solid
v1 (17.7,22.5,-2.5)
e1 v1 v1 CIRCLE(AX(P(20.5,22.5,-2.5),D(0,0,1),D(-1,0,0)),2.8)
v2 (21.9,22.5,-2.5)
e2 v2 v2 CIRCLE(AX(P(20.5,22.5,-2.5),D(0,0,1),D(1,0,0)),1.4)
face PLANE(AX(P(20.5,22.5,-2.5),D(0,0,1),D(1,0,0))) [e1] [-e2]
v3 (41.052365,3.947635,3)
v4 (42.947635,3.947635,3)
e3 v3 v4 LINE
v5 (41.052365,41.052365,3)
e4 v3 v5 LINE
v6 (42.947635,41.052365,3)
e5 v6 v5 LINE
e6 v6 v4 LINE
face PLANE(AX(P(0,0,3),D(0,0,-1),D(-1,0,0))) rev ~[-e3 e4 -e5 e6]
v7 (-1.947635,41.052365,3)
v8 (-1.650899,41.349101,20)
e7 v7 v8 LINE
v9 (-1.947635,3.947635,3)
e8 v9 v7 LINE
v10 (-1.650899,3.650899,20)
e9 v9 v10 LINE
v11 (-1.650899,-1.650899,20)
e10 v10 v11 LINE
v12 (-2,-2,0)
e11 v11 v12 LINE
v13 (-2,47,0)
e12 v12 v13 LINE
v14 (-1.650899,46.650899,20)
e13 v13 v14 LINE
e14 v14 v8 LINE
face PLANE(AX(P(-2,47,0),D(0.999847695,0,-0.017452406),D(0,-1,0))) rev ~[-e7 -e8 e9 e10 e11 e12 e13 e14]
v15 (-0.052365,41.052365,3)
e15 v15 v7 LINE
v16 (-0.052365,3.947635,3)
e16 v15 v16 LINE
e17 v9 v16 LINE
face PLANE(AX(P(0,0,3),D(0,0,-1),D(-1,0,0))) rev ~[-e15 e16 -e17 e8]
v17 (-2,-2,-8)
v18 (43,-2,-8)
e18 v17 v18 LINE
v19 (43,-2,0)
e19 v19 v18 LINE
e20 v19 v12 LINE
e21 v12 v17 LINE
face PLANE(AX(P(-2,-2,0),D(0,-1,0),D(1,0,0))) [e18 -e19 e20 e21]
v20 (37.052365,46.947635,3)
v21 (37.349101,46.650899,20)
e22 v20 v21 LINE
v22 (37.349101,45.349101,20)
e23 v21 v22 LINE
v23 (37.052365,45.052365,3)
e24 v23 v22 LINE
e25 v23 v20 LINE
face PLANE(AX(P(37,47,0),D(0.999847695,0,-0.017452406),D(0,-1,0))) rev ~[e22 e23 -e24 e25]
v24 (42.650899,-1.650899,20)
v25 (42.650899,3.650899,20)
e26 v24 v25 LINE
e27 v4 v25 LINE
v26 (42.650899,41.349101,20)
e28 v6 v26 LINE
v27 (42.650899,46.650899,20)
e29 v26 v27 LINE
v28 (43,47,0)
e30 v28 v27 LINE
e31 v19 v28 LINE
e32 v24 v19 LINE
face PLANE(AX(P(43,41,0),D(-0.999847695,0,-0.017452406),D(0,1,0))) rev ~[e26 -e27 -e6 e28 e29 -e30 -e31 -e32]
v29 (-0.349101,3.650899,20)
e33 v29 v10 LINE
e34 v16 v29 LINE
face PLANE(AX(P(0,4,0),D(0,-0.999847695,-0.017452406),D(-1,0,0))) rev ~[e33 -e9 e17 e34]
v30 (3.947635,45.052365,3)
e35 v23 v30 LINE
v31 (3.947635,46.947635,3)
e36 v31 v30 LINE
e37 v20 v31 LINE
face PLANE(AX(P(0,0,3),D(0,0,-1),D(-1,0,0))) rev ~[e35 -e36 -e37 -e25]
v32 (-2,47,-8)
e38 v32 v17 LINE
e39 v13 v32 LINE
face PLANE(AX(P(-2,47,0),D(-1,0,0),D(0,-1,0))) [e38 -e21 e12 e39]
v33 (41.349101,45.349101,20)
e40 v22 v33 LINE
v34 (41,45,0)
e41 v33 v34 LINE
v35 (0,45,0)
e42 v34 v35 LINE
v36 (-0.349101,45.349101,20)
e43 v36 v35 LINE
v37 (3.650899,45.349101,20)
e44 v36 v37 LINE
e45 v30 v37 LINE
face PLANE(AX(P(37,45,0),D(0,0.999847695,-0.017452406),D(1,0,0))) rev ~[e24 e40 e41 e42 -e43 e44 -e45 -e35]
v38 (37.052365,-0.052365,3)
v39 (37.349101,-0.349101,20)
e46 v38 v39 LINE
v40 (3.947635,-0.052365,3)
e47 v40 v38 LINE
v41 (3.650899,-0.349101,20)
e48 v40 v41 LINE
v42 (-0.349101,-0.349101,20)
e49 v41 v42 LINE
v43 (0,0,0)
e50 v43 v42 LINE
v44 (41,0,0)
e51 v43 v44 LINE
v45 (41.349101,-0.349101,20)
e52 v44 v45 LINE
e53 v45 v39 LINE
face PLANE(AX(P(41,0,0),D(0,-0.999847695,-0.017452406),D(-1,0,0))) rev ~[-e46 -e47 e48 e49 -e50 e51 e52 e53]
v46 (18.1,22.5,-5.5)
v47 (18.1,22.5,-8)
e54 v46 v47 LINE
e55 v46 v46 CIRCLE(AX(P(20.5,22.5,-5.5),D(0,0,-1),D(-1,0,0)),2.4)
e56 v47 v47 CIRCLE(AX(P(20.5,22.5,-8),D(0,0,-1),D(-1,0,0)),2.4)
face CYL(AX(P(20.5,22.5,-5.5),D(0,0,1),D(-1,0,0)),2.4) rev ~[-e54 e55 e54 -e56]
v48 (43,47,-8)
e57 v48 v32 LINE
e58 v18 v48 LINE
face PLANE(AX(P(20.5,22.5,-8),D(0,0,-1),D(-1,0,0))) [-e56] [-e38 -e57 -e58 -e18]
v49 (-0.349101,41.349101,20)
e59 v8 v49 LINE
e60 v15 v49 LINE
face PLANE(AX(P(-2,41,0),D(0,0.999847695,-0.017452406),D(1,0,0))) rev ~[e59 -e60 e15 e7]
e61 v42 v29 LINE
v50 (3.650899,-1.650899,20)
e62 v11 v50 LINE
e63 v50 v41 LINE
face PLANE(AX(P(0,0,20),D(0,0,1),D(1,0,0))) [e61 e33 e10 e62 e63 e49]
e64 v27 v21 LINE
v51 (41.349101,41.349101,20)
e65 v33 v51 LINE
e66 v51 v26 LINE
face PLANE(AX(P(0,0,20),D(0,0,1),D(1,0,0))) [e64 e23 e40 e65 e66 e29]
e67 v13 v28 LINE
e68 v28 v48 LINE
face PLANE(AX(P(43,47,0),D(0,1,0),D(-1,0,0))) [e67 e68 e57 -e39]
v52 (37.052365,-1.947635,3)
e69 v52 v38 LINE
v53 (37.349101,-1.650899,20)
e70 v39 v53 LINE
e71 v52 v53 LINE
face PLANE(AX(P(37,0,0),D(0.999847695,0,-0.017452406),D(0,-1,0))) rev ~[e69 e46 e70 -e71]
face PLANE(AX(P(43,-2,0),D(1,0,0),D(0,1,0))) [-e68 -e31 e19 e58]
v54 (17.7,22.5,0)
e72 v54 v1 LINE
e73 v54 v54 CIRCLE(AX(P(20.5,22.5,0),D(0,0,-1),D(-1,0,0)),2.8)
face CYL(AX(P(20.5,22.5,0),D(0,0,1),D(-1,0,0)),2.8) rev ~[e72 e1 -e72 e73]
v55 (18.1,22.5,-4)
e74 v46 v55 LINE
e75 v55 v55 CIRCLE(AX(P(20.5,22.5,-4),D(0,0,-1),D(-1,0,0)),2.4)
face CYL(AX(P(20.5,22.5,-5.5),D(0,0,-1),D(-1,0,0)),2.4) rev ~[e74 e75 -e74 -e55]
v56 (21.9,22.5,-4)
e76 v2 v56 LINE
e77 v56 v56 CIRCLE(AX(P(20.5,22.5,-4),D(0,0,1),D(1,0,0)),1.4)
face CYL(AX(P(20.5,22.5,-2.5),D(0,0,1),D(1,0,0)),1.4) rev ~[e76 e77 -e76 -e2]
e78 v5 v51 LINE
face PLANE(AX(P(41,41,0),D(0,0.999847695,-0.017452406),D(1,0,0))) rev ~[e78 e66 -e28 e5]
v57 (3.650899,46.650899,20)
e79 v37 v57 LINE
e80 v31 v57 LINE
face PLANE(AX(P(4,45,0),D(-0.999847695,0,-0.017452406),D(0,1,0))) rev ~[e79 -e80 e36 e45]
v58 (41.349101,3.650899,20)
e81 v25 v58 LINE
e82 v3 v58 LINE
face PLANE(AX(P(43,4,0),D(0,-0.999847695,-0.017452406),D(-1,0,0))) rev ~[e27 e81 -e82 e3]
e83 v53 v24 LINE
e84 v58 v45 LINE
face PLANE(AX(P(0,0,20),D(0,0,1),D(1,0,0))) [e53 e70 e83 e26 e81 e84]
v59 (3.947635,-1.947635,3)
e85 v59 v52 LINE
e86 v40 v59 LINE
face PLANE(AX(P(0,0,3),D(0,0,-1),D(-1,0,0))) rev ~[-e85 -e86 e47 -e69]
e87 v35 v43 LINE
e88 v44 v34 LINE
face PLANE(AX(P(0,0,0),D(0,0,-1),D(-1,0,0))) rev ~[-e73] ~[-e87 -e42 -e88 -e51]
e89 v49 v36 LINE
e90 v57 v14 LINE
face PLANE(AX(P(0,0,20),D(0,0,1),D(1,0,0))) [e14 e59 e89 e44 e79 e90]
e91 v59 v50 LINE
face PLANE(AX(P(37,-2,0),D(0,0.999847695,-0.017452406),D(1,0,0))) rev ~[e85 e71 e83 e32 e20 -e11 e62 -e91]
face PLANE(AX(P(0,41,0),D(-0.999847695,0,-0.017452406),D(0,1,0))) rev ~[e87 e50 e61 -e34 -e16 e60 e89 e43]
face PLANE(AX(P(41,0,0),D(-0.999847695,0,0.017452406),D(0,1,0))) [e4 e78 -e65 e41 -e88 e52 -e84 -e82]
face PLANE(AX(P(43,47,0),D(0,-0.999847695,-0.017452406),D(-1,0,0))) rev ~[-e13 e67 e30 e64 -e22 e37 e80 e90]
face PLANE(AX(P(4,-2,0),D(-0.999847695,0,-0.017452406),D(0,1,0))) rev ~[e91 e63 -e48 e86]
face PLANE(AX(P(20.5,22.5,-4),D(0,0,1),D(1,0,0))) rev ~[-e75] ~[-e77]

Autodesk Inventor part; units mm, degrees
ref_plane "YZ Plane" through (0, 0, 0) normal (1, 0, 0) x (0, 1, 0)
ref_plane "XZ Plane" through (0, 0, 0) normal (0, 1, 0) x (-1, 0, 0)
sketch "Szkic1" plane through (0, 0, 0) normal (0, 0, 1) x (1, 0, 0)
  line L0 (0, 0) -> (41, 0)
  line L1 (41, 0) -> (41, 45)
  line L2 (41, 45) -> (0, 45)
  line L3 (0, 45) -> (0, 0)
  line L4 (0, 45) -> (-2, 45)
  line L5 (-2, 45) -> (-2, 47)
  line L6 (41, 0) -> (41, -2)
  line L7 (41, -2) -> (43, -2)
  line L8 (43, -2) -> (-2, -2)
  line L9 (-2, -2) -> (-2, 47)
  line L10 (-2, 47) -> (43, 47)
  line L11 (43, 47) -> (43, -2)
  line L12 (41, 45) -> (37, 45)
  line L13 (37, 45) -> (37, 47)
  line L14 (43, 47) -> (37, 47)
  line L15 (41, 45) -> (41, 41)
  line L16 (41, 41) -> (43, 41)
  line L17 (43, 47) -> (43, 41)
  line L18 (43, 47) -> (37, 47)
  line L19 (20.5, 47) -> (20.5, -2)
  line L20 (-2, 22.5) -> (43, 22.5)
  line L21 (0, 45) -> (41, 45)
  line L22 (43, 47) -> (-2, 47)
  line L23 (-2, 47) -> (-2, -2)
  line L24 (4, 45) -> (4, 47)
  line L25 (0, 41) -> (-2, 41)
  line L26 (41, 0) -> (0, 0)
  line L27 (0, 0) -> (0, 45)
  line L28 (0, 0) -> (-2, 0)
  line L29 (-2, -2) -> (43, -2)
  line L30 (43, -2) -> (43, 47)
  line L31 (41, 4) -> (43, 4)
  line L32 (-2, -2) -> (-2, 47)
  line L33 (4, 0) -> (4, -2)
  line L34 (0, 0) -> (0, 4)
  line L35 (0, 4) -> (-2, 4)
  line L36 (41, 0) -> (37, 0)
  line L37 (37, 0) -> (37, -2)
  line L38 (37, -2) -> (43, -2)
  dimension "d0" = 41
  dimension "d1" = 45
  dimension "d2" = 2
  dimension "d3" = 2
  dimension "d4" = 2
  dimension "d5" = 2
  dimension "d6" = 4
  dimension "d7" = 4
  dimension "d8" = 4
  dimension "d9" = 4
sketch "Szkic1 outline for Wyciągnięcie proste1" plane through (0, 0, 0) normal (0, 0, 1) x (1, 0, 0)
  line L0 (41, 41) -> (43, 41)
  line L1 (41, 45) -> (41, 41)
  line L2 (37, 45) -> (41, 45)
  line L3 (37, 47) -> (37, 45)
  line L4 (43, 47) -> (37, 47)
  line L5 (43, 41) -> (43, 47)
  line L6 (43, 4) -> (41, 4)
  line L7 (41, 4) -> (41, 0)
  line L8 (41, 0) -> (37, 0)
  line L9 (37, 0) -> (37, -2)
  line L10 (37, -2) -> (43, -2)
  line L11 (43, -2) -> (43, 4)
  line L12 (0, 4) -> (-2, 4)
  line L13 (0, 0) -> (0, 4)
  line L14 (4, 0) -> (0, 0)
  line L15 (4, -2) -> (4, 0)
  line L16 (-2, -2) -> (4, -2)
  line L17 (-2, 4) -> (-2, -2)
  line L18 (4, 45) -> (4, 47)
  line L19 (4, 47) -> (-2, 47)
  line L20 (-2, 47) -> (-2, 41)
  line L21 (-2, 41) -> (0, 41)
  line L22 (0, 41) -> (0, 45)
  line L23 (0, 45) -> (4, 45)
extrude "Wyciągnięcie proste1" add sketch "Szkic1 outline for Wyciągnięcie proste1" along normal blind 20 draft -1
sketch "Szkic2" plane through (0, 0, 0) normal (0, 0, -1) x (-1, 0, 0)
  line L0 (-43, 41) -> (-43, 47) projected
  line L1 (2, 4) -> (2, -2) projected
  line L2 (-43, 47) -> (2, 47)
  line L3 (2, 47) -> (2, -2)
  line L4 (2, -2) -> (-43, -2)
  line L5 (-43, -2) -> (-43, 47)
  line L6 (-37, 45) -> (-41, 45) projected
  line L7 (0, 0) -> (-41, 0)
  line L8 (-41, 0) -> (-41, 45)
  line L9 (-41, 45) -> (0, 45)
  line L10 (0, 45) -> (0, 0)
extrude "Wyciągnięcie proste2" add sketch "Szkic2" against normal blind 3 draft -1
sketch "Szkic3" plane through (0, 0, 0) normal (0, 0, -1) x (-1, 0, 0)
  line L0 (2, -2) -> (1.650899, -1.650899)
  line L1 (-43, -2) -> (-43, 47)
  line L2 (2, -2) -> (-43, -2)
  line L3 (-43, -2) -> (-43, 47)
  line L4 (-43, 47) -> (2, 47)
  line L5 (2, 47) -> (2, -2)
  circle A0 centre (-20.5, 22.5) radius 2.85
  circle A1 centre (-20.5, 22.5) radius 2.8
  point P0 (0, 0)
  dimension "d14" = 5.7
  dimension "d21" = 5.6
extrude "Wyciągnięcie proste3" add sketch "Szkic3" along normal blind 8 contours L1 L4 L5 L2 | A0
ref_plane "Płaszczyzna konstrukcyjna2" through (43, 47, -4.5) normal (0, 0, -1) x (-1, 0, 0)
ref_plane "Płaszczyzna konstrukcyjna1" through (43, 47, -8) normal (0, 0, -1) x (-1, 0, 0)
sketch "Szkic4" plane through (43, 47, -4.5) normal (0, 0, -1) x (-1, 0, 0)
  circle A0 centre (22.5, -24.5) radius 2.85 projected
  circle A1 centre (22.5, -24.5) radius 1.5
  circle A2 centre (22.5, -24.5) radius 2.85
  point P0 (43, -47)
  dimension "d18" = 3
extrude "Wyciągnięcie proste4" add sketch "Szkic4" along normal blind 1
sketch "Szkic5" plane through (20.5, 22.5, -5.5) normal (0, 0, -1) x (-1, 0, 0)
  circle A0 centre (0, 0) radius 2.8
  circle A1 centre (0, 0) radius 2.4
  point P0 (20.5, -22.5)
  dimension "d22" = 4.8
extrude "Wyciągnięcie proste5" add sketch "Szkic5" along normal blind 2.5
sketch "Szkic6" plane through (20.5, 22.5, -4.5) normal (0, 0, 1) x (1, 0, 0)
  circle A0 centre (0, 0) radius 1.5
  circle A1 centre (0, 0) radius 2.8
  point P0 (-20.5, -22.5)
extrude "Wyciągnięcie proste6" add sketch "Szkic6" along normal blind 2
sketch "Szkic7" plane through (20.5, 22.5, -5.5) normal (0, 0, -1) x (-1, 0, 0)
  circle A0 centre (0, 0) radius 1.5
  circle A1 centre (0, 0) radius 2.4
  point P0 (20.5, -22.5)
extrude "Wyciągnięcie proste7" cut sketch "Szkic7" against normal blind 1.5
sketch "Szkic8" plane through (20.5, 22.5, -2.5) normal (0, 0, 1) x (1, 0, 0)
  circle A0 centre (0, 0) radius 1.4
  circle A1 centre (0, 0) radius 1.5
  point P0 (-20.5, -22.5)
  dimension "d29" = 2.8
extrude "Wyciągnięcie proste8" add sketch "Szkic8" against normal blind 1.5
properties part number "Część5_Drukowanie 3D"
